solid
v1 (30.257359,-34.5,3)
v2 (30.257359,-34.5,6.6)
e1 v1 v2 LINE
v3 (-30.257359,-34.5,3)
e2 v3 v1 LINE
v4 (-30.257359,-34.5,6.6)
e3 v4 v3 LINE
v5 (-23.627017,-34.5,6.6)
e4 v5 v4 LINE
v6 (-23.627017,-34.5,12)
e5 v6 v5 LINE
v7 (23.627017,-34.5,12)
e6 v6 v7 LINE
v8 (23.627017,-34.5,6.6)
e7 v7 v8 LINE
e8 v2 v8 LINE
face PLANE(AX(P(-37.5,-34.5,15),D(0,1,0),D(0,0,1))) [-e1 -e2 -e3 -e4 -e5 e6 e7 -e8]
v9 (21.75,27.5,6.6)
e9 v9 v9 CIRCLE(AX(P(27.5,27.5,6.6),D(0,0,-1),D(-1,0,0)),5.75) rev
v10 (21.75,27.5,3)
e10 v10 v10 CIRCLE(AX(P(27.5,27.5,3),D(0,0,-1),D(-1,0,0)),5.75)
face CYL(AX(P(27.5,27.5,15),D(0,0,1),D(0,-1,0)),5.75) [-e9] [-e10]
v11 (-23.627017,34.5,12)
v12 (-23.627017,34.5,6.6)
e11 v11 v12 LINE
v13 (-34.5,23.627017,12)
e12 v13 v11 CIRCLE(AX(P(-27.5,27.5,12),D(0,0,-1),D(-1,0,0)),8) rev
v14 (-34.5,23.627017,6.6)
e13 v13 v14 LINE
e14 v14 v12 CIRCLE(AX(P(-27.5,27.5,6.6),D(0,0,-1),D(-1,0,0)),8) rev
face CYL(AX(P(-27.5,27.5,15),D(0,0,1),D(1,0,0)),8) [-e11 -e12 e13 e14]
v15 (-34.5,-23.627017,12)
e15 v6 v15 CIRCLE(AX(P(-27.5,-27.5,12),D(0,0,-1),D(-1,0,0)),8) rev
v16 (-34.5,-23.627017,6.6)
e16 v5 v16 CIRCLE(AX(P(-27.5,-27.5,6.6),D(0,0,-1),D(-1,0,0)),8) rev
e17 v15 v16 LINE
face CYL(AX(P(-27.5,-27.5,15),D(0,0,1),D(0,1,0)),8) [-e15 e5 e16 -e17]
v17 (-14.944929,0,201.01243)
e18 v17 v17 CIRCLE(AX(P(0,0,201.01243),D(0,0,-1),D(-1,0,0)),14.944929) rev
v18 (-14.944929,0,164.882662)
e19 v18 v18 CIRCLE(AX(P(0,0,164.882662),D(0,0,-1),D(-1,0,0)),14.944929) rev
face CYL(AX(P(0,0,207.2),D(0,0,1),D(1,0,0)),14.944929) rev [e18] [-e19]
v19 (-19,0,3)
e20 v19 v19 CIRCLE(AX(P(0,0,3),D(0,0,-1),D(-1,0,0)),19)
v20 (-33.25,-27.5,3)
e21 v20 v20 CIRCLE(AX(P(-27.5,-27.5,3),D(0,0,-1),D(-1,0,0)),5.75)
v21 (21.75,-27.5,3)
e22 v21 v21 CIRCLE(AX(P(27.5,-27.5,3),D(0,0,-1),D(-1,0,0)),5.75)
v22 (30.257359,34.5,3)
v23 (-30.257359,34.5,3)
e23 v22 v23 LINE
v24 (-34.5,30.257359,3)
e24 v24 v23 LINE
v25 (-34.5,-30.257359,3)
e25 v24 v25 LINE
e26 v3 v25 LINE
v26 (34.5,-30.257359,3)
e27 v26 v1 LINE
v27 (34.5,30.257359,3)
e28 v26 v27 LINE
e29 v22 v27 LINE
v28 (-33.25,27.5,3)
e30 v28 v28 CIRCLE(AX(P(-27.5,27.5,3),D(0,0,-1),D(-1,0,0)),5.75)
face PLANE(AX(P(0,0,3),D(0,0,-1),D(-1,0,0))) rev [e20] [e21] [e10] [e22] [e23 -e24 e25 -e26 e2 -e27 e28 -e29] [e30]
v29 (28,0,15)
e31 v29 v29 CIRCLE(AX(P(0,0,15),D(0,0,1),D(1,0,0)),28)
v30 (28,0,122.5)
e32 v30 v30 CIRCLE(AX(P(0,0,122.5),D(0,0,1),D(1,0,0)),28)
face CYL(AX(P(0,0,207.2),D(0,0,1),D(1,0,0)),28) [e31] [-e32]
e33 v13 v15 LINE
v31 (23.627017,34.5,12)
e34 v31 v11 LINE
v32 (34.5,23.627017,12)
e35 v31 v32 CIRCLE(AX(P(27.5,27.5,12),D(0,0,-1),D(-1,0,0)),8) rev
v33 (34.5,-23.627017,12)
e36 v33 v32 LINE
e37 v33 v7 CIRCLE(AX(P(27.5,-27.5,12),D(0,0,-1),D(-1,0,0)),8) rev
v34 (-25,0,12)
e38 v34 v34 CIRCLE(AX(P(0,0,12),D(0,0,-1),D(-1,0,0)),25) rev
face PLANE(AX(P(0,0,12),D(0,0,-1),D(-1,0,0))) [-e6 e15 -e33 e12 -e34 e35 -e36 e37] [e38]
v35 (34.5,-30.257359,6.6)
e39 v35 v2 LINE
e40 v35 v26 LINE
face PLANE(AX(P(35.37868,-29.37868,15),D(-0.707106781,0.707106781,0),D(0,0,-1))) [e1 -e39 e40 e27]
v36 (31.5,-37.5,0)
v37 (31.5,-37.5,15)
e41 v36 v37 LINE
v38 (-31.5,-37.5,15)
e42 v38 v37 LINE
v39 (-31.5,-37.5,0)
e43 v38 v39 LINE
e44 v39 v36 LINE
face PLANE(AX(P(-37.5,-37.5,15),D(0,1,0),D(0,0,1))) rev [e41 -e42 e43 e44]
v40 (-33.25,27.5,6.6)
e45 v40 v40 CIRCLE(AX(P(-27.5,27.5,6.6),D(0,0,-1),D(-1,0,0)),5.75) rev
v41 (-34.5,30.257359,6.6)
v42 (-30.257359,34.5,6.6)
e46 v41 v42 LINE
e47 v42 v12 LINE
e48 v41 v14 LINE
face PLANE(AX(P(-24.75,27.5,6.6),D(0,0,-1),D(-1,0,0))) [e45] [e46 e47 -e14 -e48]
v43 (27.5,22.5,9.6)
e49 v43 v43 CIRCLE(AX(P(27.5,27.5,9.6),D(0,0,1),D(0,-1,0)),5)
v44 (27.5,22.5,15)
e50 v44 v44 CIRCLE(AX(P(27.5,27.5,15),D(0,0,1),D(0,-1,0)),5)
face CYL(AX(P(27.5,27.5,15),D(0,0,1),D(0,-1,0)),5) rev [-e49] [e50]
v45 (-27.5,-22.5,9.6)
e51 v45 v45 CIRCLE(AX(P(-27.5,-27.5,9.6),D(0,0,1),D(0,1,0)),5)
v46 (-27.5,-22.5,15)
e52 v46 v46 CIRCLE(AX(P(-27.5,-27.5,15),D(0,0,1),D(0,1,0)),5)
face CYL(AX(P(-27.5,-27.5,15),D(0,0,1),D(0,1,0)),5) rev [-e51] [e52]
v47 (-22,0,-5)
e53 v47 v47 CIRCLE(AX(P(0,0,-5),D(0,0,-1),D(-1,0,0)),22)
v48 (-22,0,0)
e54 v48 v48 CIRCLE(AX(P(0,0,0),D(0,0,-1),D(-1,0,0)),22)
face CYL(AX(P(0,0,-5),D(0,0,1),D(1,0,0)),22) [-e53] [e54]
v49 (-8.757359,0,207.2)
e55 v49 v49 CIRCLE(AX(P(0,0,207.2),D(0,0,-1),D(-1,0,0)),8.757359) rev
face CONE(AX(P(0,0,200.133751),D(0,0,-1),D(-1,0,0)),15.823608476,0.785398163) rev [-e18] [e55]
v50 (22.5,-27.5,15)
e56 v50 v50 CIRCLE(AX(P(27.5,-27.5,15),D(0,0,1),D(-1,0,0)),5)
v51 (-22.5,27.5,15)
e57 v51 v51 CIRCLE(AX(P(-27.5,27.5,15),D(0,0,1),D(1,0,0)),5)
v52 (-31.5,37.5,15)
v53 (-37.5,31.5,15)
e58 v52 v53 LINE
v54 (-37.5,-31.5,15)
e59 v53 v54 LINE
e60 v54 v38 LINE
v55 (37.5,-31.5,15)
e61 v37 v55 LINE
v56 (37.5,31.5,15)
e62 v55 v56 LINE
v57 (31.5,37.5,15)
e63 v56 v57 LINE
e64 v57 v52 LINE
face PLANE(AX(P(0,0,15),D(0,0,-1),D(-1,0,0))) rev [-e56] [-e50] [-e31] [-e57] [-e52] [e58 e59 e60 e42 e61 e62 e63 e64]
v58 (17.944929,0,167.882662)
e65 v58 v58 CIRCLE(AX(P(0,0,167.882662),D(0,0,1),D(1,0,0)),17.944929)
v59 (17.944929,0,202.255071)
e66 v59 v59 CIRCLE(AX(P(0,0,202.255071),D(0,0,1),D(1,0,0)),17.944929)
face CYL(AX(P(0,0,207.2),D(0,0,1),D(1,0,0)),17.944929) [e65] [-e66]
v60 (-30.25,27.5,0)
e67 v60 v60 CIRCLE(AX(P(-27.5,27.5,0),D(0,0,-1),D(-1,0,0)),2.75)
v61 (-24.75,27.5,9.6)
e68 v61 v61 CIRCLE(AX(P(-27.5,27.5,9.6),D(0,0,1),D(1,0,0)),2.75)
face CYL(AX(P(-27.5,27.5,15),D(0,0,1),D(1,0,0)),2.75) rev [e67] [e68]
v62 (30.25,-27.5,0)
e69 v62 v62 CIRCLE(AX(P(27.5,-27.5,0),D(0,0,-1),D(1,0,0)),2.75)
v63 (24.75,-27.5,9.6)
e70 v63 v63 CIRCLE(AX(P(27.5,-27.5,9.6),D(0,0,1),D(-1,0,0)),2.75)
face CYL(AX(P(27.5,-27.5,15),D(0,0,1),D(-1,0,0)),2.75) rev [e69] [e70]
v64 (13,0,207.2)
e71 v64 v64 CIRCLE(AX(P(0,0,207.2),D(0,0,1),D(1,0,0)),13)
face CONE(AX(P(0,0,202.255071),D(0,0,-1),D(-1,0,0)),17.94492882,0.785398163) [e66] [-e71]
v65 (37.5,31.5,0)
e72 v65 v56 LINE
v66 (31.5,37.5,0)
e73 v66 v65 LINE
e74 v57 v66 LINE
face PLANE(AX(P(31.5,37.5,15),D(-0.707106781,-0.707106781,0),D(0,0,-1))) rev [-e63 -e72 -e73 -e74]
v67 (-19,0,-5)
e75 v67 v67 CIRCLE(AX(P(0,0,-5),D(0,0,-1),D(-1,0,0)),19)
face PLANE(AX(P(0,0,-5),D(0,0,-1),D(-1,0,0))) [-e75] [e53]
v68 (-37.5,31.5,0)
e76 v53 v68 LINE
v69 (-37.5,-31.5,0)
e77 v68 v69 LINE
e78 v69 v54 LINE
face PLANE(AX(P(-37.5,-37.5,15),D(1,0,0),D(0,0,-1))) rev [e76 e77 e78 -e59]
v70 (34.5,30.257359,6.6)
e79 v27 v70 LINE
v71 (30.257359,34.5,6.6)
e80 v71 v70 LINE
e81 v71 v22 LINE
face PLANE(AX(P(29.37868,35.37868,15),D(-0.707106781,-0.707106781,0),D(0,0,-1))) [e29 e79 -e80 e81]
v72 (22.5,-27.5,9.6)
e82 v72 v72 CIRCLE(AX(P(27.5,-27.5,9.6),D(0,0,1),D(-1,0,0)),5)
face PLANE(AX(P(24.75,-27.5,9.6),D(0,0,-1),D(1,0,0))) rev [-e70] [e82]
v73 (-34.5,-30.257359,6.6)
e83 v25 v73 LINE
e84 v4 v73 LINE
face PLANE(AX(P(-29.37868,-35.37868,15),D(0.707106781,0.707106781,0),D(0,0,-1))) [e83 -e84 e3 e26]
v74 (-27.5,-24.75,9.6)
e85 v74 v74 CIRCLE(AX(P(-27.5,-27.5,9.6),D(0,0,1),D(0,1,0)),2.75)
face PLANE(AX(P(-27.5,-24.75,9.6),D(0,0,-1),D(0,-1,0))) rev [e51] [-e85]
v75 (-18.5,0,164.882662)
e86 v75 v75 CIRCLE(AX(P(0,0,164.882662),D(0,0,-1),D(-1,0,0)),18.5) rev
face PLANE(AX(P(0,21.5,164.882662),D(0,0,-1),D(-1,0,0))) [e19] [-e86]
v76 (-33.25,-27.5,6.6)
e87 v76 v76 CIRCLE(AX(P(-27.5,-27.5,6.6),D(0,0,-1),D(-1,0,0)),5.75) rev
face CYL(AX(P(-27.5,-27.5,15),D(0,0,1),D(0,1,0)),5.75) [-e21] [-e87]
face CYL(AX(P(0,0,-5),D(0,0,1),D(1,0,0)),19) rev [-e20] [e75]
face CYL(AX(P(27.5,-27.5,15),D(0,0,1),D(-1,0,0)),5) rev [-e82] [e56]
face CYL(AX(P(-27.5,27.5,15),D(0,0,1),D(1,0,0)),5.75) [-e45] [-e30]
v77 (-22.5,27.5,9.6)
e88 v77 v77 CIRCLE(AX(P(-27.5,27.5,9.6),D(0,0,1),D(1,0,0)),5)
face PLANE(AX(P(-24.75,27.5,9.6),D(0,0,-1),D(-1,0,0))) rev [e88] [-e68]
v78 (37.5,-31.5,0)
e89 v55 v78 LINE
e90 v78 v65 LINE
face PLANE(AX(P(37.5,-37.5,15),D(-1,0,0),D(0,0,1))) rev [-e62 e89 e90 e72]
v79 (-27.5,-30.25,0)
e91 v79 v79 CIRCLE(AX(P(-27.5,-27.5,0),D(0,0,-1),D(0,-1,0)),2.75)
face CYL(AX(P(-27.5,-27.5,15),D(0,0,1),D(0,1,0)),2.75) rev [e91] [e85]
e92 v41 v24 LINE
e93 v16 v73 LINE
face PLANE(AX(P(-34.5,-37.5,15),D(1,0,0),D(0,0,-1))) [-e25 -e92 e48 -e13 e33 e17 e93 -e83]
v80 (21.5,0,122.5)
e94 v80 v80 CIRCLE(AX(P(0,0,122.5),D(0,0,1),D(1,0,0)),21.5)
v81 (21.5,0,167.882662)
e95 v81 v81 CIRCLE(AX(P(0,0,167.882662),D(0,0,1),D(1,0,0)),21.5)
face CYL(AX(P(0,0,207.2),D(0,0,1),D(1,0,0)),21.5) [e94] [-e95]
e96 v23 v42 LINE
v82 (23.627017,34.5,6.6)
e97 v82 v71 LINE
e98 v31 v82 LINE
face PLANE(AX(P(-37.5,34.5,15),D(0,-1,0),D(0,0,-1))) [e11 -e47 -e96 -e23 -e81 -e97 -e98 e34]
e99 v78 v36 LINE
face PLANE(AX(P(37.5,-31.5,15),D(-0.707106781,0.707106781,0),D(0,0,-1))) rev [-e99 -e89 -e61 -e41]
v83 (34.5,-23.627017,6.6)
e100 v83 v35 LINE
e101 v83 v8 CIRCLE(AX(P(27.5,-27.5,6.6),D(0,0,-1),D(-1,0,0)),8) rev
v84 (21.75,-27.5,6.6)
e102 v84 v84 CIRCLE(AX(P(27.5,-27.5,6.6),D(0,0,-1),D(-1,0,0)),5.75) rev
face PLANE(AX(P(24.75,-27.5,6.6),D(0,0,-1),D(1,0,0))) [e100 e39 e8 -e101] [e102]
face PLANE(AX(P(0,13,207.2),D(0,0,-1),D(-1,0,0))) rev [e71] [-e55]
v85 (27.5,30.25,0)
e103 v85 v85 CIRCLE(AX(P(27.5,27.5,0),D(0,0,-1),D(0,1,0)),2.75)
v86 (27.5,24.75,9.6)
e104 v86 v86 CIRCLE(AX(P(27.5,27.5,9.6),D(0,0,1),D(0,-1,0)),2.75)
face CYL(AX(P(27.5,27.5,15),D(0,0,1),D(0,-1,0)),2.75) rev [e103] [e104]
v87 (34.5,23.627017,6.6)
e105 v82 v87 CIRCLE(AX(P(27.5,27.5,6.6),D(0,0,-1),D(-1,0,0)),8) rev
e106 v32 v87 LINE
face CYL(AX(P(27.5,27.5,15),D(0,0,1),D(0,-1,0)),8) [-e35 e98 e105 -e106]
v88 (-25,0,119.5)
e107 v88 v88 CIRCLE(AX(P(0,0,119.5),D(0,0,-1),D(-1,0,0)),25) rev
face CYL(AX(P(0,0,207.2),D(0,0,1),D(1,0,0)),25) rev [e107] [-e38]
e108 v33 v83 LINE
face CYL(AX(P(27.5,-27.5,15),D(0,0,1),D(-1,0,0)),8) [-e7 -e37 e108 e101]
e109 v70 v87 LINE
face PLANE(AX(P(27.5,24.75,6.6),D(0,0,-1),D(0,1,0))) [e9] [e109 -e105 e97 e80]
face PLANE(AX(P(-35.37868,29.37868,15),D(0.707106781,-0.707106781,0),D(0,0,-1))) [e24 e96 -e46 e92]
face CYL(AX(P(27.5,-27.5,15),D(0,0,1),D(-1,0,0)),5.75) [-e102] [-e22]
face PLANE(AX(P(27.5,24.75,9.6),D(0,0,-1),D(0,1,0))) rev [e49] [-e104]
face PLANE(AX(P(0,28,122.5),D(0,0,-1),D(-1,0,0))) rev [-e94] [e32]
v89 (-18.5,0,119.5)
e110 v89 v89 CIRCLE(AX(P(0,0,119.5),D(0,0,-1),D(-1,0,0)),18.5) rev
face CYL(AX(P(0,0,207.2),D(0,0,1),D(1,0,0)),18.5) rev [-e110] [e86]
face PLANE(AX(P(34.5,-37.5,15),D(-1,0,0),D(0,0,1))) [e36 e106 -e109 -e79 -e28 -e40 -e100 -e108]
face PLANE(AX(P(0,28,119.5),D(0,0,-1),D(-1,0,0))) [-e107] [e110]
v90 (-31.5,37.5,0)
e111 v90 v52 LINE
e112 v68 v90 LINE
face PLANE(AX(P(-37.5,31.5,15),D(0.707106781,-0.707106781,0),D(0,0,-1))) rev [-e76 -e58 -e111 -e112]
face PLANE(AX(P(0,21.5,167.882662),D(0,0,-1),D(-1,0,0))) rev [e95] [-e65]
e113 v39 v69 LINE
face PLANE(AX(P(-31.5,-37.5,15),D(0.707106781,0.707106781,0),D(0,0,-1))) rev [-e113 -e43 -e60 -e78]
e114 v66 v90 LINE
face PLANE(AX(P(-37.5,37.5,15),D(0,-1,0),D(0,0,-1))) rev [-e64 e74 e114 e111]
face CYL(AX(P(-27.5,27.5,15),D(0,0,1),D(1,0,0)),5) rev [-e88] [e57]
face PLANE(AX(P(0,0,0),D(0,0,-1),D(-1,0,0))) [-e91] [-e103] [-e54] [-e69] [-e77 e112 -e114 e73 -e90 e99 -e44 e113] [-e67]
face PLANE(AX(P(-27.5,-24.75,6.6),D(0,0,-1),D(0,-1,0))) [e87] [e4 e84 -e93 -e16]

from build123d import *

# Parameters (mm, degrees)
SKETCH1_W                                           = 75
SKETCH1_H                                           = 75
BOSS_EXTRUDE1_DEPTH                                 = 15
SKETCH2_R                                           = 22
BOSS_EXTRUDE2_DEPTH                                 = 5
CBORE_FOR_M5_HEX_SOCKET_HEAD_CAP_SCREW1_D           = 5.5
CBORE_FOR_M5_HEX_SOCKET_HEAD_CAP_SCREW1_CBORE_D     = 10
CBORE_FOR_M5_HEX_SOCKET_HEAD_CAP_SCREW1_CBORE_DEPTH = 5.4
CIRPATTERN1_COUNT                                   = 4
CHAMFER1_SIZE                                       = 6
SHELL1_START                                        = 3
SHELL1_OUTLINE_R                                    = 25
SHELL1_DEPTH                                        = 116.5
SHELL1_START_2                                      = -5
SHELL1_2_OUTLINE_R                                  = 14.94492882
SHELL1_2_DEPTH                                      = 206.012430393
SHELL1_3_OUTLINE_R                                  = 18.5
SHELL1_3_OUTLINE_R_2                                = 14.94492882
SHELL1_3_DEPTH                                      = 169.882661511
SHELL1_4_OUTLINE_R                                  = 25
SHELL1_4_DEPTH                                      = 9
SHELL1_5_OUTLINE_R                                  = 5.75
SHELL1_5_DEPTH                                      = 3.6
SHELL1_6_OUTLINE_R                                  = 19
SHELL1_6_OUTLINE_R_2                                = 18.5
SHELL1_6_DEPTH                                      = 8


with BuildPart() as part:
    # Sketch1 → Boss-Extrude1 (new body)
    with BuildSketch(Plane.XY):
        Rectangle(SKETCH1_W, SKETCH1_H)
    extrude(amount=BOSS_EXTRUDE1_DEPTH)

    # Sketch2 → Boss-Extrude2 (add)
    with BuildSketch(Plane(origin=(0, 0, 0), x_dir=(-1, 0, 0), z_dir=(0, 0, -1))):
        Circle(SKETCH2_R)
    extrude(amount=BOSS_EXTRUDE2_DEPTH)

    # Sketch3 → Revolve1 (revolve)
    with BuildSketch(Plane(origin=(0, 0, 0), x_dir=(0, 0, -1), z_dir=(1, 0, 0)), mode=Mode.PRIVATE) as revolve1_sk:
        Polygon((-15, 28), (-122.5, 28), (-122.5, 21.5), (-167.882661511, 21.5), (-167.882661511, 17.94492882), (-202.25507118, 17.94492882), (-207.2, 13), (-207.2, 0), (-15, 0), align=None)
    revolve(revolve1_sk.sketch.rotate(Axis((0, 0, 207.2), (0, 0, -1)), 90), axis=Axis((0, 0, 207.2), (0, 0, -1)))

    # CBORE for M5 Hex Socket Head Cap Screw1 (through all)
    with Locations(Plane.XY.offset(15)):
        with Locations((-27.5, 27.5)):
            cbore_for_m5_hex_socket_head_cap_screw1 = CounterBoreHole(CBORE_FOR_M5_HEX_SOCKET_HEAD_CAP_SCREW1_D / 2, CBORE_FOR_M5_HEX_SOCKET_HEAD_CAP_SCREW1_CBORE_D / 2, CBORE_FOR_M5_HEX_SOCKET_HEAD_CAP_SCREW1_CBORE_DEPTH)

    # CirPattern1: CBORE for M5 Hex Socket Head Cap Screw1 ×4 about axis
    cirpattern1_axis = Axis((0, 0, 0), (0, 0, 1))
    for i in range(1, CIRPATTERN1_COUNT):
        add(cbore_for_m5_hex_socket_head_cap_screw1.rotate(cirpattern1_axis, i * 360 / CIRPATTERN1_COUNT), mode=Mode.SUBTRACT)

    # Chamfer1
    chamfer1_edges = [part.edges().sort_by_distance(p)[0] for p in [
        (37.5, -37.5, 7.5),
        (-37.5, -37.5, 7.5),
        (-37.5, 37.5, 7.5),
        (37.5, 37.5, 7.5),
    ]]
    chamfer(chamfer1_edges, length=CHAMFER1_SIZE)

    # Shell1: read off the stored shape, not the designer's step
    # Shell1 outline → Shell1 (cut)
    with BuildSketch(Plane.XY.offset(SHELL1_START)):
        Circle(SHELL1_OUTLINE_R)
    extrude(amount=SHELL1_DEPTH, mode=Mode.SUBTRACT)

    # Shell1 2 outline → Shell1 2 (cut)
    with BuildSketch(Plane.XY.offset(SHELL1_START_2)):
        Circle(SHELL1_2_OUTLINE_R)
    extrude(amount=SHELL1_2_DEPTH, mode=Mode.SUBTRACT)

    # Shell1 3 outline → Shell1 3 (cut)
    with BuildSketch(Plane.XY.offset(SHELL1_START_2)):
        Circle(SHELL1_3_OUTLINE_R)
        Circle(SHELL1_3_OUTLINE_R_2, mode=Mode.SUBTRACT)
    extrude(amount=SHELL1_3_DEPTH, mode=Mode.SUBTRACT)

    # Shell1 4 outline → Shell1 4 (cut)
    with BuildSketch(Plane.XY.offset(SHELL1_START)):
        with BuildLine():
            Line((-34.5, 23.627016654), (-34.5, -23.627016654))
            ThreePointArc((-34.5, -23.627016654), (-21.843145751, -21.843145751), (-23.627016654, -34.5))
            Line((-23.627016654, -34.5), (23.627016654, -34.5))
            ThreePointArc((23.627016654, -34.5), (21.843145751, -21.843145751), (34.5, -23.627016654))
            Line((34.5, -23.627016654), (34.5, 23.627016654))
            ThreePointArc((34.5, 23.627016654), (21.843145751, 21.843145751), (23.627016654, 34.5))
            Line((23.627016654, 34.5), (-23.627016654, 34.5))
            ThreePointArc((-23.627016654, 34.5), (-21.843145751, 21.843145751), (-34.5, 23.627016654))
        make_face()
        Circle(SHELL1_4_OUTLINE_R, mode=Mode.SUBTRACT)
    extrude(amount=SHELL1_4_DEPTH, mode=Mode.SUBTRACT)

    # Shell1 5 outline → Shell1 5 (cut)
    # profile 1 of 4: a face of its own
    with BuildSketch(Plane.XY.offset(SHELL1_START)):
        with BuildLine():
            Line((-34.5, -23.627016654), (-34.5, -30.257359313))
            Line((-34.5, -30.257359313), (-30.257359313, -34.5))
            Line((-30.257359313, -34.5), (-23.627016654, -34.5))
            ThreePointArc((-23.627016654, -34.5), (-21.843145751, -21.843145751), (-34.5, -23.627016654))
        make_face()
        with Locations((-27.5, -27.5)):
            Circle(SHELL1_5_OUTLINE_R, mode=Mode.SUBTRACT)
    # profile 2 of 4: a face of its own
    with BuildSketch(Plane.XY.offset(SHELL1_START)):
        with BuildLine():
            Line((-34.5, 30.257359313), (-34.5, 23.627016654))
            ThreePointArc((-34.5, 23.627016654), (-21.843145751, 21.843145751), (-23.627016654, 34.5))
            Line((-23.627016654, 34.5), (-30.257359313, 34.5))
            Line((-30.257359313, 34.5), (-34.5, 30.257359313))
        make_face()
        with Locations((-27.5, 27.5)):
            Circle(SHELL1_5_OUTLINE_R, mode=Mode.SUBTRACT)
    # profile 3 of 4: a face of its own
    with BuildSketch(Plane.XY.offset(SHELL1_START)):
        with BuildLine():
            ThreePointArc((34.5, -23.627016654), (21.843145751, -21.843145751), (23.627016654, -34.5))
            Line((23.627016654, -34.5), (30.257359313, -34.5))
            Line((30.257359313, -34.5), (34.5, -30.257359313))
            Line((34.5, -30.257359313), (34.5, -23.627016654))
        make_face()
        with Locations((27.5, -27.5)):
            Circle(SHELL1_5_OUTLINE_R, mode=Mode.SUBTRACT)
    # profile 4 of 4: a face of its own
    with BuildSketch(Plane.XY.offset(SHELL1_START)):
        with BuildLine():
            Line((30.257359313, 34.5), (23.627016654, 34.5))
            ThreePointArc((23.627016654, 34.5), (21.843145751, 21.843145751), (34.5, 23.627016654))
            Line((34.5, 23.627016654), (34.5, 30.257359313))
            Line((34.5, 30.257359313), (30.257359313, 34.5))
        make_face()
        with Locations((27.5, 27.5)):
            Circle(SHELL1_5_OUTLINE_R, mode=Mode.SUBTRACT)
    extrude(amount=SHELL1_5_DEPTH, mode=Mode.SUBTRACT)

    # Shell1 6 outline → Shell1 6 (cut)
    with BuildSketch(Plane.XY.offset(SHELL1_START_2)):
        Circle(SHELL1_6_OUTLINE_R)
        Circle(SHELL1_6_OUTLINE_R_2, mode=Mode.SUBTRACT)
    extrude(amount=SHELL1_6_DEPTH, mode=Mode.SUBTRACT)

    # Shell1 7 outline → Shell1 7 (revolve, cut)
    with BuildSketch(Plane.XZ):
        Polygon((0, 201.012430393), (14.94492882, 201.012430426), (8.757359313, 207.2), (0, 207.2), align=None)
    revolve(axis=Axis((0, 0, 0), (0, 0, 1)), mode=Mode.SUBTRACT)


solid = part.part
